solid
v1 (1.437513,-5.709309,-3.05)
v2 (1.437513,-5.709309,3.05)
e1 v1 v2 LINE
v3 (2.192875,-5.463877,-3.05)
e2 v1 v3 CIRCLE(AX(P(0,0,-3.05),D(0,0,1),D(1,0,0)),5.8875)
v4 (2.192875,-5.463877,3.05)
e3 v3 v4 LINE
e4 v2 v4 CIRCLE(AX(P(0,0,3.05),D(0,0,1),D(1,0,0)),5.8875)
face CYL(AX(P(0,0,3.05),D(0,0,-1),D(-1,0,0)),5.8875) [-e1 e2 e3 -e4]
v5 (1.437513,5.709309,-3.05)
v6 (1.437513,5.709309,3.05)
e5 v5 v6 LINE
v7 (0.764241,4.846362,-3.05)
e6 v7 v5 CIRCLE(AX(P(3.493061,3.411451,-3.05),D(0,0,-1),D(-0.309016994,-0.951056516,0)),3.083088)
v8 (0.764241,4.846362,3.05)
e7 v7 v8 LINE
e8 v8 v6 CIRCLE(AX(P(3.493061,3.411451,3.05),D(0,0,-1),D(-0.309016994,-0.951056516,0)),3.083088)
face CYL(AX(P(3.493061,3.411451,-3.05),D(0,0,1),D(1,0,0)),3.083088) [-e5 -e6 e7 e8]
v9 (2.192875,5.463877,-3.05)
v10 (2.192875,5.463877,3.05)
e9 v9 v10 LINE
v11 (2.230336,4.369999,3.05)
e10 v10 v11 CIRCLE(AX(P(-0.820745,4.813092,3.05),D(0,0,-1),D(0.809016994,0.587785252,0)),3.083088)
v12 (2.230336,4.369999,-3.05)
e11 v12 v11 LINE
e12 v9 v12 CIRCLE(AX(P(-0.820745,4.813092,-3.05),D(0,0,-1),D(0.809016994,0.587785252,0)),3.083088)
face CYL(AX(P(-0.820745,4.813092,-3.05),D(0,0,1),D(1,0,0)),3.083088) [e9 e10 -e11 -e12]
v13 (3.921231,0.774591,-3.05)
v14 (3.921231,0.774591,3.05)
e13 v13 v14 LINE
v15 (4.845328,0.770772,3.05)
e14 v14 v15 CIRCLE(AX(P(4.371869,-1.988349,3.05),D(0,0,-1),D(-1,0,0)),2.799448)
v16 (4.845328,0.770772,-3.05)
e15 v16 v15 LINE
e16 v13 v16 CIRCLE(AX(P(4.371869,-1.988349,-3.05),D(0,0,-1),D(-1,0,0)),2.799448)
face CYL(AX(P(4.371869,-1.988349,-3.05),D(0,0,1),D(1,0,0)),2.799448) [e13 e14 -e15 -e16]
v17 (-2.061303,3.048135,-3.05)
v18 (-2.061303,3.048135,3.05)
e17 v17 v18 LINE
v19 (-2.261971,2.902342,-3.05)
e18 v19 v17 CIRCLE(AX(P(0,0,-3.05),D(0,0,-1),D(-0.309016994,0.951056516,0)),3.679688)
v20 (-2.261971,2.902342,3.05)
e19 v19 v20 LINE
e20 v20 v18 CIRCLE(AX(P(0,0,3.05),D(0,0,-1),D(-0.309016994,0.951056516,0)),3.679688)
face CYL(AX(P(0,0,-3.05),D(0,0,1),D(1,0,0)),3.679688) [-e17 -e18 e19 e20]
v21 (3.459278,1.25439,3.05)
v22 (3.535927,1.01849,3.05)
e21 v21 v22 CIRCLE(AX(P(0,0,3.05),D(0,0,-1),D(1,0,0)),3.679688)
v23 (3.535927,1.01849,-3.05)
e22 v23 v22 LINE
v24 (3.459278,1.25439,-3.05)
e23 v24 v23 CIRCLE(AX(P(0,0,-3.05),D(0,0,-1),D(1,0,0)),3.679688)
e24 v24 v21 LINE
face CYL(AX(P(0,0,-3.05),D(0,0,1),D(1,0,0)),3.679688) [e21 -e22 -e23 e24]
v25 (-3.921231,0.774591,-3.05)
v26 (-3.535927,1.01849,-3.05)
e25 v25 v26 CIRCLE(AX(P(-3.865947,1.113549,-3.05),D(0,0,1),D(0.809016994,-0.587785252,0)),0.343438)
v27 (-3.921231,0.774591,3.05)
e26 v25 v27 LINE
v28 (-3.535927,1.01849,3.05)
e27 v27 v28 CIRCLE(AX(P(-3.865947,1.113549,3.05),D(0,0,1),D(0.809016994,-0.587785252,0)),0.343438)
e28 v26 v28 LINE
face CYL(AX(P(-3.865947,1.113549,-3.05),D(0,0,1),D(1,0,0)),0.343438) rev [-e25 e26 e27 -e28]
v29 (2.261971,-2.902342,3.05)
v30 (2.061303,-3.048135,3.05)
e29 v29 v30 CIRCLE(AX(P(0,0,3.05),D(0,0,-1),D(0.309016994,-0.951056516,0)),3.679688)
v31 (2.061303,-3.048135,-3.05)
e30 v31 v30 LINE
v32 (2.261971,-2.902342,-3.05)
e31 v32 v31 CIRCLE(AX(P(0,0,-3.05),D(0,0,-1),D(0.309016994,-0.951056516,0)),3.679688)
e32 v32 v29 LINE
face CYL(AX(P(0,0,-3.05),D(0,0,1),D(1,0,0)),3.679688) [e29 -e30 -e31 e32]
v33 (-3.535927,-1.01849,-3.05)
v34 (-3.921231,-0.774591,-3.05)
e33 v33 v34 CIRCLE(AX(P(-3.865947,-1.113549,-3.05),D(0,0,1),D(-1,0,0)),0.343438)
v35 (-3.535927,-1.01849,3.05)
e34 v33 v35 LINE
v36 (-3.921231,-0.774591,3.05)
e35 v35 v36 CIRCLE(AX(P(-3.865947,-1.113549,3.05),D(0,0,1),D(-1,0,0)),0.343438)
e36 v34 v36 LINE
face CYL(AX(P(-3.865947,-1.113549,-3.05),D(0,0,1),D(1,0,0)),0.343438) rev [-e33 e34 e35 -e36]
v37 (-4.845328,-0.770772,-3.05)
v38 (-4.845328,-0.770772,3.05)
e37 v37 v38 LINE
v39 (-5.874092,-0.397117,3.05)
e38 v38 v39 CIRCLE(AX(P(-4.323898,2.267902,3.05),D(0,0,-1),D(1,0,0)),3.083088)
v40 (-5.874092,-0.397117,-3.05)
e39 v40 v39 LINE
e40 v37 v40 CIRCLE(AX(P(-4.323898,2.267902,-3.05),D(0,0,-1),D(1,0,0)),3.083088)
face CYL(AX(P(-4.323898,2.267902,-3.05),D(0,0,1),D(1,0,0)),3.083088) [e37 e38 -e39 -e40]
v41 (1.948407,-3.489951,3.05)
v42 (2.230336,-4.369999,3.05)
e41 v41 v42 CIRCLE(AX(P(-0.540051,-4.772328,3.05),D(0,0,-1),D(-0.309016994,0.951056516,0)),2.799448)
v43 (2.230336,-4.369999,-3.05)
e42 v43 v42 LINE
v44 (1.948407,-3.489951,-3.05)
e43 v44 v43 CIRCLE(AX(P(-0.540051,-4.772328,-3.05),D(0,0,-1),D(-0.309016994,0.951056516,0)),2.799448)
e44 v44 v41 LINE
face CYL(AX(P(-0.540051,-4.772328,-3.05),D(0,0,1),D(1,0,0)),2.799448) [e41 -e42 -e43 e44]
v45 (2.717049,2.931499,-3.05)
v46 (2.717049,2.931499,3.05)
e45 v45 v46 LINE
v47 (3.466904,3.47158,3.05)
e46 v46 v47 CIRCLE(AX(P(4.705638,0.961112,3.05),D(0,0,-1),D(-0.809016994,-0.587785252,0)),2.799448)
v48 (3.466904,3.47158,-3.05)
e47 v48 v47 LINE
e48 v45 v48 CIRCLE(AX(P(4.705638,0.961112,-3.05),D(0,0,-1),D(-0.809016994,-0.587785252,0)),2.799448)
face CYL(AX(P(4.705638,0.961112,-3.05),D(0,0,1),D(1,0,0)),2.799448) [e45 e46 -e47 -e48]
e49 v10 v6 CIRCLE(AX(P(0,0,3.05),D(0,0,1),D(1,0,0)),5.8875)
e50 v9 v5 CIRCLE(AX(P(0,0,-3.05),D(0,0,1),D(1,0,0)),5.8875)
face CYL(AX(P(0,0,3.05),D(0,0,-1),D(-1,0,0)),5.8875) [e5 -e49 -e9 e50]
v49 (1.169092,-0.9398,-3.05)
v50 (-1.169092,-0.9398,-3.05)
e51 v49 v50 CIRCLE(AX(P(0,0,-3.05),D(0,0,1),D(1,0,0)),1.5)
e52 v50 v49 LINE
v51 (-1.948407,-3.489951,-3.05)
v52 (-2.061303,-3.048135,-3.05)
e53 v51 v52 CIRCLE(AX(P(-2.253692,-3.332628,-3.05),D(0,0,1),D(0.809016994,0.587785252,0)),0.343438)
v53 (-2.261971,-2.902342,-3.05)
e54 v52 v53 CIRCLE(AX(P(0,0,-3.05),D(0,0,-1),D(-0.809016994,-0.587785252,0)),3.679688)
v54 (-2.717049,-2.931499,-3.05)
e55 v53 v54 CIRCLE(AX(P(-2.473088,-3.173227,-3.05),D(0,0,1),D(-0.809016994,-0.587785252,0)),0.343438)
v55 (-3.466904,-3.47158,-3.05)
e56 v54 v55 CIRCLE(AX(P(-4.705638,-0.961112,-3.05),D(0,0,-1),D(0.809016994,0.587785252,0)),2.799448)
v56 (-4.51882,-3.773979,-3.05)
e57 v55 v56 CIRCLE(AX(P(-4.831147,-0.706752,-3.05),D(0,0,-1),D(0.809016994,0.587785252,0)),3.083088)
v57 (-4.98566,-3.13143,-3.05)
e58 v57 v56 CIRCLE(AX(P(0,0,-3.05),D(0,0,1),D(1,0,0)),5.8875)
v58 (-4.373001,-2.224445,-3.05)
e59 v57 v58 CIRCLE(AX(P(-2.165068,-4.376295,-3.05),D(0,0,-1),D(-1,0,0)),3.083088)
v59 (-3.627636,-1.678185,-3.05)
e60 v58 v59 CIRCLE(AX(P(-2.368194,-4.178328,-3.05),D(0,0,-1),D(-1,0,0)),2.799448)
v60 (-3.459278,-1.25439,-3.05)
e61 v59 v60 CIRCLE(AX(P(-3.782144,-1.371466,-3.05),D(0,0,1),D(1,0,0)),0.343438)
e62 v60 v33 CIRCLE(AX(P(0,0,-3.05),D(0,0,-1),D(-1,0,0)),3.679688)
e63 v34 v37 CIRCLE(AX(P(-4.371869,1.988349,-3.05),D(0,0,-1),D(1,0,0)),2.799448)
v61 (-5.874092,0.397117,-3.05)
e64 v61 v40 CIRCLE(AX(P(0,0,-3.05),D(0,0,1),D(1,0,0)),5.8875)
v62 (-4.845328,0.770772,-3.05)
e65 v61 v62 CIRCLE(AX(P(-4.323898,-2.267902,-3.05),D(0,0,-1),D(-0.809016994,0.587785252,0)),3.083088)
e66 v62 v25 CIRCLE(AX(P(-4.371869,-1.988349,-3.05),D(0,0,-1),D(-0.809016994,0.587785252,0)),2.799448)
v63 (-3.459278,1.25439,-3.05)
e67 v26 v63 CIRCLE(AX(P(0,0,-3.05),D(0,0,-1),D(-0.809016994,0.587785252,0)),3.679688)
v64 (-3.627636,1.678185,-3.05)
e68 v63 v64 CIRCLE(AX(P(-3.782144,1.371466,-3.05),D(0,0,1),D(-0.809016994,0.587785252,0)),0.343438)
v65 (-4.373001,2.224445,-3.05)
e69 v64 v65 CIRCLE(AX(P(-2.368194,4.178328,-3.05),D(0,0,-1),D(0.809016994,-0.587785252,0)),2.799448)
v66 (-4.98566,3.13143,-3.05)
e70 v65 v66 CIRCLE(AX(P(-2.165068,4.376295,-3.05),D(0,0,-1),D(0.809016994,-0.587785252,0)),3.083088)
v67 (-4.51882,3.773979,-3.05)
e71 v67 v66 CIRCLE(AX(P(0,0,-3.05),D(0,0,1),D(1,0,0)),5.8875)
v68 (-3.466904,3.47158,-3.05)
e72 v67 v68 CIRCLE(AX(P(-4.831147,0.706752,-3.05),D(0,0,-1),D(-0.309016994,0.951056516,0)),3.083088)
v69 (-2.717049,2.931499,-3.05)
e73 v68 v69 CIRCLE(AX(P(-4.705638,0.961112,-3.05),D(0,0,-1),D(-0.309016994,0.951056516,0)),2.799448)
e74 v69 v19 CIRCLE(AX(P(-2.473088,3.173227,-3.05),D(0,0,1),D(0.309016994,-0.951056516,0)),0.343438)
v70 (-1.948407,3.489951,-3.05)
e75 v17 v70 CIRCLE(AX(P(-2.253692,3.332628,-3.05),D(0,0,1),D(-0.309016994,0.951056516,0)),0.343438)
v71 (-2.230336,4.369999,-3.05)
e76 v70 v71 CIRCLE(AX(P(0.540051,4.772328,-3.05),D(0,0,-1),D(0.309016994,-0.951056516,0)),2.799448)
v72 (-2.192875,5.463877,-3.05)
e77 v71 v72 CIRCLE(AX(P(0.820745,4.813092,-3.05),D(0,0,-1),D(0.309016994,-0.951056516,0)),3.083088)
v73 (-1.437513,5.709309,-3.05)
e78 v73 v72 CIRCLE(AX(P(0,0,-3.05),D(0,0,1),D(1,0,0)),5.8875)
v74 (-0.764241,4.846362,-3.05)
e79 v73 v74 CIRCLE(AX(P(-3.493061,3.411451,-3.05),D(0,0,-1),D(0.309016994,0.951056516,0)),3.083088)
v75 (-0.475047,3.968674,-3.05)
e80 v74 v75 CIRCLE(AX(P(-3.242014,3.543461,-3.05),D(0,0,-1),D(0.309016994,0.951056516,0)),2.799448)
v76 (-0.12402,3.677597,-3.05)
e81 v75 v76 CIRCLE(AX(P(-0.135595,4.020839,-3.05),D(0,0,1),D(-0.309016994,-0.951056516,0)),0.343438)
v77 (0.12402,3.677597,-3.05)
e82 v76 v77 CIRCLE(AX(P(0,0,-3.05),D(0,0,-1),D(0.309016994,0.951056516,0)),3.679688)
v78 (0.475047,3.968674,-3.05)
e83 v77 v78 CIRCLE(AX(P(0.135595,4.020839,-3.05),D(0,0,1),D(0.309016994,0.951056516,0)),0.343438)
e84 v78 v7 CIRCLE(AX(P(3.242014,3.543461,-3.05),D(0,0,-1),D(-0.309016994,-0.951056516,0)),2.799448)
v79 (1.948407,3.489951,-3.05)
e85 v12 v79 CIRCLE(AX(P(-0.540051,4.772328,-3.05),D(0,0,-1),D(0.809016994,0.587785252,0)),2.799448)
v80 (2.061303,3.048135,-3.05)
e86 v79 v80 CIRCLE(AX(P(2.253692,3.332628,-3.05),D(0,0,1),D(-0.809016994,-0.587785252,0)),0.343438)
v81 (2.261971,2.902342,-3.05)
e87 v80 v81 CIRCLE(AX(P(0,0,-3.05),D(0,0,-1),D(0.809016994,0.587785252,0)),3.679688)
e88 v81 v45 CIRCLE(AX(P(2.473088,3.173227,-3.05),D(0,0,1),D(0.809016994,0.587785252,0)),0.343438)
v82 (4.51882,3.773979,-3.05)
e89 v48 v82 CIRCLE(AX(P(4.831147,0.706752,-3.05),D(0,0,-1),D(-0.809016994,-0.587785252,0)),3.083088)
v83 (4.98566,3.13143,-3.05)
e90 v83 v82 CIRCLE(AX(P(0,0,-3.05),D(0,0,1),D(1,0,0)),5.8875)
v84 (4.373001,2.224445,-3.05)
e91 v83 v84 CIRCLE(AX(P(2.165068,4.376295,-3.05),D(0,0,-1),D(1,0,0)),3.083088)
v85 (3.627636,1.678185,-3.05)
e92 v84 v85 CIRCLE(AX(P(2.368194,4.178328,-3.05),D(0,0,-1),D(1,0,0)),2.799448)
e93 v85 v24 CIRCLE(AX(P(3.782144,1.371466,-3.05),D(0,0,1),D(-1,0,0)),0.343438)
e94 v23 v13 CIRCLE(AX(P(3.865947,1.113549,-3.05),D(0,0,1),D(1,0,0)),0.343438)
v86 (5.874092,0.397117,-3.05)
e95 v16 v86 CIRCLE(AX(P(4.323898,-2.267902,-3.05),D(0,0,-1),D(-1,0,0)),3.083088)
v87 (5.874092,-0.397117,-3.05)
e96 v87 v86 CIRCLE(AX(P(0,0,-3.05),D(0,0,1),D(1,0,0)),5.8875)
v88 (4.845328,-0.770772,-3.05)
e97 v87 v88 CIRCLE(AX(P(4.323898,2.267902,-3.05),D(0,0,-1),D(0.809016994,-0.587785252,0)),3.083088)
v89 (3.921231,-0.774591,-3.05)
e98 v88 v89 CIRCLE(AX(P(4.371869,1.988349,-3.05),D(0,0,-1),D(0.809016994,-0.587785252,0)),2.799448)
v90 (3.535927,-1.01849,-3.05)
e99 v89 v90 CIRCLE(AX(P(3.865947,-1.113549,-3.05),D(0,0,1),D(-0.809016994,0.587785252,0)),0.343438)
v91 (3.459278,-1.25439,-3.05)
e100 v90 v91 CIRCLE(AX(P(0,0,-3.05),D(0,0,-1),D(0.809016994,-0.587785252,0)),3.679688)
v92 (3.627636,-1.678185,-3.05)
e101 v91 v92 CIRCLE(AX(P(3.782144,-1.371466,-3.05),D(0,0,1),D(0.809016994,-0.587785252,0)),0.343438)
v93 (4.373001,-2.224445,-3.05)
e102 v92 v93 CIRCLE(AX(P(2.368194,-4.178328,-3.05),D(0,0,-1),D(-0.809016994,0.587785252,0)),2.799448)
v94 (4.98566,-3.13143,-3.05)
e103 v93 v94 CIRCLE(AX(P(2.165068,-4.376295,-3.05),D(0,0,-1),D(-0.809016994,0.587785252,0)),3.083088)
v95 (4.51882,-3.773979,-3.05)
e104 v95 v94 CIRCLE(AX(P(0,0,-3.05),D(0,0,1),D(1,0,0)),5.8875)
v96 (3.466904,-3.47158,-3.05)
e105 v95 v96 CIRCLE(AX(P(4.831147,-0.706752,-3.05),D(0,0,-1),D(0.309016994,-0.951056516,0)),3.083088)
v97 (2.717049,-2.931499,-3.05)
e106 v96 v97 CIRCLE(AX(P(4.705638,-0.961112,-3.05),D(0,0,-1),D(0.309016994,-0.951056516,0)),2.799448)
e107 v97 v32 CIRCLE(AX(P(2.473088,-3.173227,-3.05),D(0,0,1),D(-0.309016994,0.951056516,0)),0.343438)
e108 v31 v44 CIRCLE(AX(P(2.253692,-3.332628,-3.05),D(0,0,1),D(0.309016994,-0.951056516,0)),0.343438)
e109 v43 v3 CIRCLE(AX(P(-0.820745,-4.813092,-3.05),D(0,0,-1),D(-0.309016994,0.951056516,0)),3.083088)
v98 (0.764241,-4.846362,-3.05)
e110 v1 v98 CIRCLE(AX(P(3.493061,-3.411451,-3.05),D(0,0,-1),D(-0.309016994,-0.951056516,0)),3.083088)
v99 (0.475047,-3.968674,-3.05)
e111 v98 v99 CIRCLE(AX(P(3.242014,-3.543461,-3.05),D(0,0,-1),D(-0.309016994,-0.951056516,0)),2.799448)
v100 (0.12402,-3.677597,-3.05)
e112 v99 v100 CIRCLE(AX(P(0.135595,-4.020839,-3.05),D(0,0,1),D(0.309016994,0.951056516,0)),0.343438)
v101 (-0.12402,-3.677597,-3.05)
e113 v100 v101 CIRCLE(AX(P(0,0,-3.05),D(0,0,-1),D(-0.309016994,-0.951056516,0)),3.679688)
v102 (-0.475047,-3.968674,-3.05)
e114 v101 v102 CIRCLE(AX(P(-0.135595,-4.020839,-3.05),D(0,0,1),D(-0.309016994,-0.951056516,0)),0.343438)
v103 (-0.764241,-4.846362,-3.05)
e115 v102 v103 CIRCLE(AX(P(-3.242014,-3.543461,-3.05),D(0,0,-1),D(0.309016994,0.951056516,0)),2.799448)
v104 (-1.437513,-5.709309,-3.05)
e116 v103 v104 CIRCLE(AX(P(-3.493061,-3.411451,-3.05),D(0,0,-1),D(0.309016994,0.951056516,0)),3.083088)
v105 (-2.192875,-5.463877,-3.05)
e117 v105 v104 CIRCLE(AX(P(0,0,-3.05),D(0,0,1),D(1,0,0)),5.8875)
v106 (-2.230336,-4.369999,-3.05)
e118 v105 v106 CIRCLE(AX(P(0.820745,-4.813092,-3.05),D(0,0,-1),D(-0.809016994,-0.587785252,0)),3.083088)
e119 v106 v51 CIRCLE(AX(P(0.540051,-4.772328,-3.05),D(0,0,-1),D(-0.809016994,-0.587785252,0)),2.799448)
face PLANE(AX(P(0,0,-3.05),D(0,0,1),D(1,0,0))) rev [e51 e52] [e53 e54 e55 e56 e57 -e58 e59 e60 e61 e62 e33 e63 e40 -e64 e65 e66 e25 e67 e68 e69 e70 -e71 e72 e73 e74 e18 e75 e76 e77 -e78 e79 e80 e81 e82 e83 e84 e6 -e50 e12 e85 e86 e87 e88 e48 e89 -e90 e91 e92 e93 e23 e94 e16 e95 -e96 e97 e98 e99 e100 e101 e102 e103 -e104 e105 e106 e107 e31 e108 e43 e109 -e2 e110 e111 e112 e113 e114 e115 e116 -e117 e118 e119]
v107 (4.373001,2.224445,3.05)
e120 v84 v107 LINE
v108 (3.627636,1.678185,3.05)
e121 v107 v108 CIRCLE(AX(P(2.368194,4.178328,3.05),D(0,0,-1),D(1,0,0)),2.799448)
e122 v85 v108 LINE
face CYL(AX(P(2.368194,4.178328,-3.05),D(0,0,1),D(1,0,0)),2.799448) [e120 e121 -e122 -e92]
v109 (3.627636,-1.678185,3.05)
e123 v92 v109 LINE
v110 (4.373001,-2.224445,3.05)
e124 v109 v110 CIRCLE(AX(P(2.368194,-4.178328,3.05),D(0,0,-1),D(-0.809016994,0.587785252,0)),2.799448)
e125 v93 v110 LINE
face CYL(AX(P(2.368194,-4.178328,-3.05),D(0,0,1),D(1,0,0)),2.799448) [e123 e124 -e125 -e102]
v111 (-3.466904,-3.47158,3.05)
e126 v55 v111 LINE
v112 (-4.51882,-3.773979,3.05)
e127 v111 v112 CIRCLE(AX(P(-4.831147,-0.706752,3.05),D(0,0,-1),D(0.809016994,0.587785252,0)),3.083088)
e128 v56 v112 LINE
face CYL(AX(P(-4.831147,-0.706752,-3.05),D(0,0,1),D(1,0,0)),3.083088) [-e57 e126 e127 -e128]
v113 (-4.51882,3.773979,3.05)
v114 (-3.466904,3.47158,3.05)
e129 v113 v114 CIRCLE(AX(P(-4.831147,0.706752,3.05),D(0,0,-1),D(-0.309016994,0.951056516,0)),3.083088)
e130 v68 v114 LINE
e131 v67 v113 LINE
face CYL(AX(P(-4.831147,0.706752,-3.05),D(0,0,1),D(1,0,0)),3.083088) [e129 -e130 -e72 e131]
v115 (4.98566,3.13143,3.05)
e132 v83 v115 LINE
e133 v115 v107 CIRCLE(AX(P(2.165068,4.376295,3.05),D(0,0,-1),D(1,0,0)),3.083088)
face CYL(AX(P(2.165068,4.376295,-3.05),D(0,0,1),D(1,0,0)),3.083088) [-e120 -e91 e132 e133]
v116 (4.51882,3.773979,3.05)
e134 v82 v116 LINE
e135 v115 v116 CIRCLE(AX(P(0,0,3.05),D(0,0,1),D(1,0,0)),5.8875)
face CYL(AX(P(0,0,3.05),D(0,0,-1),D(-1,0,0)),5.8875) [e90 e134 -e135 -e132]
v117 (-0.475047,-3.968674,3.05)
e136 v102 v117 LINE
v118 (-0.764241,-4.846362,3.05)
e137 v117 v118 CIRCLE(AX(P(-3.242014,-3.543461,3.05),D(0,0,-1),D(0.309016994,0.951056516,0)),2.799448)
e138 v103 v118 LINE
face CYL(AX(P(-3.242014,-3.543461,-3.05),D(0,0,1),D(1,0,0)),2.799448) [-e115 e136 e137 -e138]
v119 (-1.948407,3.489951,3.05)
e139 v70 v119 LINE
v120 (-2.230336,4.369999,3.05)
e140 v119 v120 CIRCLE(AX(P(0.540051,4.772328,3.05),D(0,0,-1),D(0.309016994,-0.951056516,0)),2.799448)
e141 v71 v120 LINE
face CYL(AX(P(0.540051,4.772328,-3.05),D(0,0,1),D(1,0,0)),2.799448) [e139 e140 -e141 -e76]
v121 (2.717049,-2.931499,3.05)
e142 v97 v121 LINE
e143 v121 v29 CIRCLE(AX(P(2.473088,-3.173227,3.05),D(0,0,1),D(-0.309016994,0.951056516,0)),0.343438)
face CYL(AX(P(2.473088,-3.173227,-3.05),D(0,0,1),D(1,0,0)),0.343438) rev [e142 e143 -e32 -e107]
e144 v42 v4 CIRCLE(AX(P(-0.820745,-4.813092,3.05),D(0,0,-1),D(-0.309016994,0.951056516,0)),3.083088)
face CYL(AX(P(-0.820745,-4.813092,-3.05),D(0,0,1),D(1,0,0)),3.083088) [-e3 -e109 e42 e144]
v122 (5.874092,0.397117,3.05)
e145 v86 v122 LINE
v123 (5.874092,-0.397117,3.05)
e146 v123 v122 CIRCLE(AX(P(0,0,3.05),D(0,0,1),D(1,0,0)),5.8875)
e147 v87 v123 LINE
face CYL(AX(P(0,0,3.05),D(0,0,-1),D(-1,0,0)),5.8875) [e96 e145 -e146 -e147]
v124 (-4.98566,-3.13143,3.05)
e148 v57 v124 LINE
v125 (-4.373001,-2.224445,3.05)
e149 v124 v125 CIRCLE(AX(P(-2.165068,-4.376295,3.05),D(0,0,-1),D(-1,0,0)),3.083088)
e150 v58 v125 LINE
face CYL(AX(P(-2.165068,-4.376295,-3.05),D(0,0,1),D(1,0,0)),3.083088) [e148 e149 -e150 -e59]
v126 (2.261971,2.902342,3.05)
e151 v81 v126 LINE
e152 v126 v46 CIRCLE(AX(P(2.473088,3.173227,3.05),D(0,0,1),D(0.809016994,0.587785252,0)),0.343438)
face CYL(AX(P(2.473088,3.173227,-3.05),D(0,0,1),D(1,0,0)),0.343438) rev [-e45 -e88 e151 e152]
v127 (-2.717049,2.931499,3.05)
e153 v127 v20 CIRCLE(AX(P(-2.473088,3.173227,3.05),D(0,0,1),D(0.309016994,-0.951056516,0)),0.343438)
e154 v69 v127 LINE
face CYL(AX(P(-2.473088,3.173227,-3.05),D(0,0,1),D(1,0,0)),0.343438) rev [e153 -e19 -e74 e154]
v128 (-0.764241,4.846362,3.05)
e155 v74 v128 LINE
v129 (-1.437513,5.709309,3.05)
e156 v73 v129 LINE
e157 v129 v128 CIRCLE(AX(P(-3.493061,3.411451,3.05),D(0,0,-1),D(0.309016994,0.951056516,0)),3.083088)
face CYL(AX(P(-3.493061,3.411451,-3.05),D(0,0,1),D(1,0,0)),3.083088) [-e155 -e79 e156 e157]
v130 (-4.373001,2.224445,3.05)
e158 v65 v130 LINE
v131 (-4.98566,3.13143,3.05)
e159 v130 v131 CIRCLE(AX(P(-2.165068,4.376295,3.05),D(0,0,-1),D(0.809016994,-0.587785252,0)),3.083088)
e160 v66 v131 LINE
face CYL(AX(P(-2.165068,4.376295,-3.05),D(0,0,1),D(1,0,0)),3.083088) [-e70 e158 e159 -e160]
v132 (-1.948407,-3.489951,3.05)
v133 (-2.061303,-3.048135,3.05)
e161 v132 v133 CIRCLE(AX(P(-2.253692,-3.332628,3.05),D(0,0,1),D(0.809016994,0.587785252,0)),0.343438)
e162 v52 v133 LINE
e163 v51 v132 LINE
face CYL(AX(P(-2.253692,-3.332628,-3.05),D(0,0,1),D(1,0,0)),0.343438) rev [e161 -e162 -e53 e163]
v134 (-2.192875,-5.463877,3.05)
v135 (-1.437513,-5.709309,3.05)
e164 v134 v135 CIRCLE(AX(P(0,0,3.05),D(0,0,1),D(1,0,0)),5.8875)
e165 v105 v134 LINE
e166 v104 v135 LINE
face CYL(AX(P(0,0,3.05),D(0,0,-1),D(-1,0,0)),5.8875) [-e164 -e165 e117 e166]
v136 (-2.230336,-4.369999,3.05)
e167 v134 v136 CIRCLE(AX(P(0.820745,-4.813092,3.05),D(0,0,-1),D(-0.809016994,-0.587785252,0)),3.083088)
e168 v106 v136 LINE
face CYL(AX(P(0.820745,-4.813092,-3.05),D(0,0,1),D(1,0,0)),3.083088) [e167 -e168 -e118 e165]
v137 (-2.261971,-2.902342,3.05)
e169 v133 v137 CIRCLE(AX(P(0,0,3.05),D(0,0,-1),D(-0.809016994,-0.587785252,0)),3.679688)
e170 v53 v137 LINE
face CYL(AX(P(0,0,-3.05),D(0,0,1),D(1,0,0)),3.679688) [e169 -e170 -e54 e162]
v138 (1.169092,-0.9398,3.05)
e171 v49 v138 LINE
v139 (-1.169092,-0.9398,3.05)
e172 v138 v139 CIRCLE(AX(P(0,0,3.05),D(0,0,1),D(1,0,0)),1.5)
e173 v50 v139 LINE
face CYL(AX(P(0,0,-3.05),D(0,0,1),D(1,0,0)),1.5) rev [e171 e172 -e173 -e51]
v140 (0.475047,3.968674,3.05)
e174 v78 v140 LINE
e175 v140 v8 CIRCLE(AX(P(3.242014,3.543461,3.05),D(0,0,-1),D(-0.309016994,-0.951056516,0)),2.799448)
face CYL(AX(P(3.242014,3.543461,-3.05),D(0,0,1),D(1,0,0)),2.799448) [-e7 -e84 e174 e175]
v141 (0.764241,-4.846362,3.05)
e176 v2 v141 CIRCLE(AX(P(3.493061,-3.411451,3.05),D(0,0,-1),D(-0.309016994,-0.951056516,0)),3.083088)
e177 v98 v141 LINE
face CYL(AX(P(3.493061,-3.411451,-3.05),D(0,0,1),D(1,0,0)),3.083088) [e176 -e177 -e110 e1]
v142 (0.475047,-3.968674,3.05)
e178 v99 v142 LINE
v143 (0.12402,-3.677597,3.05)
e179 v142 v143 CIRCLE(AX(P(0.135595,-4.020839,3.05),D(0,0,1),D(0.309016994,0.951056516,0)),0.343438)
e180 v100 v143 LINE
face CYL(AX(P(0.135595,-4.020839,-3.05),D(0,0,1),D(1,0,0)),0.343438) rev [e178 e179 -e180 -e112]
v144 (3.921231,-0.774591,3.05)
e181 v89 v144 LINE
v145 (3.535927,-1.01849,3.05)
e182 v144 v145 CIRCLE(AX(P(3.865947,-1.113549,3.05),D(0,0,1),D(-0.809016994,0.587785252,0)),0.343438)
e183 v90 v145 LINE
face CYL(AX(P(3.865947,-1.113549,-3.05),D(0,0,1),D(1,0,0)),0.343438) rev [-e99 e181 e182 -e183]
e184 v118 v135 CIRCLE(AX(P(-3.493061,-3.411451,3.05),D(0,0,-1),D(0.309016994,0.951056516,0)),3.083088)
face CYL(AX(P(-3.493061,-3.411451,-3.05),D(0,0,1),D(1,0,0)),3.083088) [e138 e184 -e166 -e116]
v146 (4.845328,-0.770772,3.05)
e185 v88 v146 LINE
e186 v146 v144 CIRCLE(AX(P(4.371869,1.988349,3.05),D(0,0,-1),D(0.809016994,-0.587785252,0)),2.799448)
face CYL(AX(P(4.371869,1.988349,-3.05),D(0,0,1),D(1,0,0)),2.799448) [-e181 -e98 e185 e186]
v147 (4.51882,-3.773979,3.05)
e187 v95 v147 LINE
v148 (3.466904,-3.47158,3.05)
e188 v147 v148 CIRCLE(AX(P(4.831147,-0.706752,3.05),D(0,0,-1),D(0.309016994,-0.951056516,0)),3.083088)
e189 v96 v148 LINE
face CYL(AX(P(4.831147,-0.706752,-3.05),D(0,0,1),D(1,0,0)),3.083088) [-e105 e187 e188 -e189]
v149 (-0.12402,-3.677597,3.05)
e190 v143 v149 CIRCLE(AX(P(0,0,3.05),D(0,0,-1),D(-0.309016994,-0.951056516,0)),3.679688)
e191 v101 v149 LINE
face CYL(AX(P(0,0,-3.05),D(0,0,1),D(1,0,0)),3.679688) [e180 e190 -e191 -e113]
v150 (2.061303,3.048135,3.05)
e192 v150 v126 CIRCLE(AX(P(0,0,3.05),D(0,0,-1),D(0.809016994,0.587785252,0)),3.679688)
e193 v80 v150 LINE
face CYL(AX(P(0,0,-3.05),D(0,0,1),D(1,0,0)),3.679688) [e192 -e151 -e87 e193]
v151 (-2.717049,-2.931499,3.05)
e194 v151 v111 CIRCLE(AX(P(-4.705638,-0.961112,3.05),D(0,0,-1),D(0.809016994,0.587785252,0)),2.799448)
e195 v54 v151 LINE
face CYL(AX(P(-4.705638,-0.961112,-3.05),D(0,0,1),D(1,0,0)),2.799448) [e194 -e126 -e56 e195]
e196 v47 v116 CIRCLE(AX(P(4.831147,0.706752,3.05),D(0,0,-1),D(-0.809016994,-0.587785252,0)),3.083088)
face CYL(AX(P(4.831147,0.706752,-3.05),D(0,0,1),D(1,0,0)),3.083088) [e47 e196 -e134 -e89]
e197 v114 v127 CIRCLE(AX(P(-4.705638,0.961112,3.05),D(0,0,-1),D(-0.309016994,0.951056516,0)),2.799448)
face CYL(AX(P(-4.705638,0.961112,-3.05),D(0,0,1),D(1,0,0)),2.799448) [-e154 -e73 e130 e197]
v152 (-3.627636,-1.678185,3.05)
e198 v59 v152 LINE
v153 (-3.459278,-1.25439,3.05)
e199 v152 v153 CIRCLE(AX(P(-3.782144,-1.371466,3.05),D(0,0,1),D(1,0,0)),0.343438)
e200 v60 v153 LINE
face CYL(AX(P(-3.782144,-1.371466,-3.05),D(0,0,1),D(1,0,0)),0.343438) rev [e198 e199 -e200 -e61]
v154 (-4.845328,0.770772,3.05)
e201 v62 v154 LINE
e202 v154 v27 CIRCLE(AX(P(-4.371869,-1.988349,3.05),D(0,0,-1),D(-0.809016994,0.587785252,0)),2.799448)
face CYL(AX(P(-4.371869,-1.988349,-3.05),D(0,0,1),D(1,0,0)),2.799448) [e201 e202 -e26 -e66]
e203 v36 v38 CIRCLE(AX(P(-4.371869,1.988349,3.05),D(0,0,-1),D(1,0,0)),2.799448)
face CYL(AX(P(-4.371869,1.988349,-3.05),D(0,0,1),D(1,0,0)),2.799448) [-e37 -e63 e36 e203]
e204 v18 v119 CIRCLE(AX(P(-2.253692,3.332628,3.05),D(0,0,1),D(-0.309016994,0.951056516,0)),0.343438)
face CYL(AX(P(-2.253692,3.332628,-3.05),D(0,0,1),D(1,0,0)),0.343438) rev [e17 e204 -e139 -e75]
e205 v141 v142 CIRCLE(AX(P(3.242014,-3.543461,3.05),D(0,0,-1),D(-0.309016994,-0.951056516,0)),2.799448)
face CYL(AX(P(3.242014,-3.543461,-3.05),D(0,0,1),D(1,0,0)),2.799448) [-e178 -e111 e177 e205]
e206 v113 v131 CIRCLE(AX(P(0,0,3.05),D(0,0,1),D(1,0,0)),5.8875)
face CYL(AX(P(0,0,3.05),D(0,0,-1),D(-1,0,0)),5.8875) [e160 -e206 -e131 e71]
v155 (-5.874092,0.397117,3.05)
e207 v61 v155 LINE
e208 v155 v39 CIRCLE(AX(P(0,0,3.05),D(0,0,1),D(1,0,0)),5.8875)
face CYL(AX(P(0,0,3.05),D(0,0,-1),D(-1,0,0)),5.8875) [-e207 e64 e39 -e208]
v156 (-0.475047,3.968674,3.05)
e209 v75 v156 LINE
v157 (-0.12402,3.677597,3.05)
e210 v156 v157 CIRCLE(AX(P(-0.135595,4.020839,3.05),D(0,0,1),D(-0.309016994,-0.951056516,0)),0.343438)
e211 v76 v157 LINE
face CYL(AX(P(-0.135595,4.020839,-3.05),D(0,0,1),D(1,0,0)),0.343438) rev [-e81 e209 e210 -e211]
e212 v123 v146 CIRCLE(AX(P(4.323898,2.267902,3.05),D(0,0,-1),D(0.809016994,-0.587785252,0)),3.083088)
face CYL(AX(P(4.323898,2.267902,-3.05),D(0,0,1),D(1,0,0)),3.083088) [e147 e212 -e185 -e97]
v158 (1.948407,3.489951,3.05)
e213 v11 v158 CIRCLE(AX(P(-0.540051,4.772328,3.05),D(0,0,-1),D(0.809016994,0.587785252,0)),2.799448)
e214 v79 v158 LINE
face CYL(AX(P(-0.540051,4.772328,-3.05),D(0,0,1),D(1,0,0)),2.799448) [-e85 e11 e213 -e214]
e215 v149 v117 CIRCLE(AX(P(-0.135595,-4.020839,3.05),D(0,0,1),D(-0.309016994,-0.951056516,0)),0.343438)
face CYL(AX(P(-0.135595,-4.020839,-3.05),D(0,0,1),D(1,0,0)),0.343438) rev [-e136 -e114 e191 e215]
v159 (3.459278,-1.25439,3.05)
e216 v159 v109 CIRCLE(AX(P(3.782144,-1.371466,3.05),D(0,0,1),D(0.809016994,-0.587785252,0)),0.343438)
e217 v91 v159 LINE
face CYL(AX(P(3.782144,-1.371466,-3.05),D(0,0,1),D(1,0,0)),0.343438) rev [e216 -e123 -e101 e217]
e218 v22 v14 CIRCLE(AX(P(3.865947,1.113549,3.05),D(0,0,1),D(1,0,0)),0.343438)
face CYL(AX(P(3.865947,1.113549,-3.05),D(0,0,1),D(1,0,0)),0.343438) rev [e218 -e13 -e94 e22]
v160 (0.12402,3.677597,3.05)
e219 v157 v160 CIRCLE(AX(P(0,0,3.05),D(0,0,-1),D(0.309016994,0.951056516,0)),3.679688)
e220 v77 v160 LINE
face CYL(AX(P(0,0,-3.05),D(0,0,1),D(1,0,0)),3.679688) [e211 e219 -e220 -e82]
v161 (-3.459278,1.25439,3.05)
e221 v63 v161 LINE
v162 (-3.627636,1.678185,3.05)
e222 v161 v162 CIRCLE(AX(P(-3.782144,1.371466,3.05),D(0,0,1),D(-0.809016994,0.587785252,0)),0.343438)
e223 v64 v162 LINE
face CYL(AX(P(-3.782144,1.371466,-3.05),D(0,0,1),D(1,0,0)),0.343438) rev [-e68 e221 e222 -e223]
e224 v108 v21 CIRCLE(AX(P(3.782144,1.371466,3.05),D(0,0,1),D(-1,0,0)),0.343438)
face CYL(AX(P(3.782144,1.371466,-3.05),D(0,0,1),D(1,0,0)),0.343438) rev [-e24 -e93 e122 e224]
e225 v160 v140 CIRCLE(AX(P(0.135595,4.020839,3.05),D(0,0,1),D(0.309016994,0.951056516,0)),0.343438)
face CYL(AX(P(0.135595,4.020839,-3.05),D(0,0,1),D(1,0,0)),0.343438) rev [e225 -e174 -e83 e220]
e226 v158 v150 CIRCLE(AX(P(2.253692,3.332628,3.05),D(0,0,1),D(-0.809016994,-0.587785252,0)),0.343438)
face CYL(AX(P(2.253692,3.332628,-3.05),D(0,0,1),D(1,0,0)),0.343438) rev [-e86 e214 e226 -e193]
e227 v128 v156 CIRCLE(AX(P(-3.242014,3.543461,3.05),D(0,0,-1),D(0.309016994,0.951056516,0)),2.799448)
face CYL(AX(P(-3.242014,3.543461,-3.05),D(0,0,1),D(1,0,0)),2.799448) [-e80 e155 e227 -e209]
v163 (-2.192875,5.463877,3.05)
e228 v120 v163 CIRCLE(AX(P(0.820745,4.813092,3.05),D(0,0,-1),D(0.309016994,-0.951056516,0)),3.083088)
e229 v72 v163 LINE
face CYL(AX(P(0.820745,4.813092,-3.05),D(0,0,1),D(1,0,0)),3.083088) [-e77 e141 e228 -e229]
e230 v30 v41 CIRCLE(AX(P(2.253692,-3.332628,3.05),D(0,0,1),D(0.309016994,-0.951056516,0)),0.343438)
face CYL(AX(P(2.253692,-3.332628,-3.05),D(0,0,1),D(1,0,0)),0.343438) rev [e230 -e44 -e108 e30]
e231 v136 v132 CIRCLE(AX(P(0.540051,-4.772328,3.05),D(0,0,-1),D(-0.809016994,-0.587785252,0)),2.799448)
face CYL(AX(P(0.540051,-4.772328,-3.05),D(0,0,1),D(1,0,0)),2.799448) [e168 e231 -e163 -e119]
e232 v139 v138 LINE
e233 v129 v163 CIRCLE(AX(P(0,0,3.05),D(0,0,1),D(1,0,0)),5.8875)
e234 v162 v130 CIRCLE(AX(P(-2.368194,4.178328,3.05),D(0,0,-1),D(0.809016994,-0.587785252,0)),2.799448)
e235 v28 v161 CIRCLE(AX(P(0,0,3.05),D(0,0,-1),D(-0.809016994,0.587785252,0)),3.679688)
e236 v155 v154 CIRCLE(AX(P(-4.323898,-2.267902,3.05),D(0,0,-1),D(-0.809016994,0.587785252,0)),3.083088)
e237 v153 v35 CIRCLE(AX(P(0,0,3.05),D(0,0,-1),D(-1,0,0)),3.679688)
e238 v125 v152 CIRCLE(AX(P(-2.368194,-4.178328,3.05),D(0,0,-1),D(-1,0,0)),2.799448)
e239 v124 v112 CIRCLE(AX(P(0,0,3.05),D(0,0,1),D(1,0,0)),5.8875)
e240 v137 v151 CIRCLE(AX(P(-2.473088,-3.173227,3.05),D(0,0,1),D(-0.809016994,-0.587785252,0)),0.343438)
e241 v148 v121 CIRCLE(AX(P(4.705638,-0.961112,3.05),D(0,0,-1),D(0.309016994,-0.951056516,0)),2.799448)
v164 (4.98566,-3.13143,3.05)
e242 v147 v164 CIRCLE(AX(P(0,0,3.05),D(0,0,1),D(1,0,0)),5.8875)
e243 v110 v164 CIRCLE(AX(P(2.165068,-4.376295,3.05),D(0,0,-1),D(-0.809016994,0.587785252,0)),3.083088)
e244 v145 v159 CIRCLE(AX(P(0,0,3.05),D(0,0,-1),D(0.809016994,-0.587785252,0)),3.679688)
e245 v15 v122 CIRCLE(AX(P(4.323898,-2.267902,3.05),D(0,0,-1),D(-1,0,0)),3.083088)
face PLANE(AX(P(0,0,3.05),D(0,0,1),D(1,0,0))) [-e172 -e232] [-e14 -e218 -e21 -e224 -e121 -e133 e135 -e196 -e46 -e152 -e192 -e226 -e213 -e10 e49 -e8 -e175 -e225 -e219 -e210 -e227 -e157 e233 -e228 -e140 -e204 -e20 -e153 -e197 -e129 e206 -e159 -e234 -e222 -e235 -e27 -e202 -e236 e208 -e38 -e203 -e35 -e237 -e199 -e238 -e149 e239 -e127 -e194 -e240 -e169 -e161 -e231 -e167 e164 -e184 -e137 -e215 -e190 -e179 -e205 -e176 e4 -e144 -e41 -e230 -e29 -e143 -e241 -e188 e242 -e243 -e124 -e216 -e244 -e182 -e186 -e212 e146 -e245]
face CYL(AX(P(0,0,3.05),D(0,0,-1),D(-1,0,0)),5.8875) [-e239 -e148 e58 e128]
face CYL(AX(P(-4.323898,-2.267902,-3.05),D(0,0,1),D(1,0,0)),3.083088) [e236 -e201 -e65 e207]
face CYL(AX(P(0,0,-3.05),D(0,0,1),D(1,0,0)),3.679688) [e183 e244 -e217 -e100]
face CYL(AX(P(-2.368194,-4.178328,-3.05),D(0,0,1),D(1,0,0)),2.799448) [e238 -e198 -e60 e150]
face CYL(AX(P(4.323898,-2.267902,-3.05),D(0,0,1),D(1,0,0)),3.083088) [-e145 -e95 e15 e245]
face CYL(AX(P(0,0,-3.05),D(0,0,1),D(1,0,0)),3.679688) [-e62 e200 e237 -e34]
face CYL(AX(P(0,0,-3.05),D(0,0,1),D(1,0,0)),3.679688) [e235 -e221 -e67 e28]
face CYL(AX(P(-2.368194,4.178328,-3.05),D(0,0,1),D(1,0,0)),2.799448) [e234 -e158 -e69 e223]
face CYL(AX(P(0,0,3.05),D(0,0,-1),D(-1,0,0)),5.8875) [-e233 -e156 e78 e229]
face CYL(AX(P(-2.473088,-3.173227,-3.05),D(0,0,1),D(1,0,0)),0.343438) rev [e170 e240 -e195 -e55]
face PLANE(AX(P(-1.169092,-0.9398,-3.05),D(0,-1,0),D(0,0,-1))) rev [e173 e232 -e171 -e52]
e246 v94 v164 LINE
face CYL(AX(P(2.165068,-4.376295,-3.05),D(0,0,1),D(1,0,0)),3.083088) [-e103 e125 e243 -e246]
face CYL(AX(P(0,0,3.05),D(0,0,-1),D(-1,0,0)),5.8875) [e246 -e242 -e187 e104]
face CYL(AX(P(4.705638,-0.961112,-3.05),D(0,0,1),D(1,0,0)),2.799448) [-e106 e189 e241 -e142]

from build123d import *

# Parameters (mm, degrees)
SKETCH1_R                = 5.887500036
BLANK_DISK_DEPTH         = 3.05
GEAR_TOOTH_CUT_DEPTH     = 11.321594513
GEAR_START               = -3.049999996
GEAR_TEETH_REVOLVE_DEPTH = 6.099999992
HUB_EXTRUDE_DEPTH        = 11.221001367


# Read off the part's stored shape, not the designer's step: GEAR TEETH REVOLVE
with BuildPart() as part:
    # Sketch1 → BLANK DISK (new, symmetric)
    with BuildSketch(Plane.XY):
        with Locations(Location((0, 0, 0), (0, 0, 180))):
            Circle(SKETCH1_R)
    extrude(amount=BLANK_DISK_DEPTH, both=True)

    # Sketch2 → GEAR TOOTH CUT (cut, through all)
    with BuildSketch(Plane.XY.offset(3.049999996)):
        with BuildLine():
            ThreePointArc((-4.985659759, -3.131429935), (-5.599345274, -1.819337566), (-5.874091808, -0.397117245))
            ThreePointArc((-5.874091808, -0.397117245), (-5.376423722, -0.629962338), (-4.845327653, -0.77077188))
            ThreePointArc((-4.845327653, -0.77077188), (-4.383437981, -0.811075473), (-3.921230969, -0.774590865))
            ThreePointArc((-3.921230969, -0.774590865), (-3.682257583, -0.823363871), (-3.535926696, -1.018490385))
            ThreePointArc((-3.535926696, -1.018490385), (-3.499590796, -1.137085978), (-3.459278416, -1.254389535))
            ThreePointArc((-3.459278416, -1.254389535), (-3.462970103, -1.498261339), (-3.627635579, -1.678184561))
            ThreePointArc((-3.627635579, -1.678184561), (-4.023014022, -1.920346358), (-4.373000758, -2.224444588))
            ThreePointArc((-4.373000758, -2.224444588), (-4.719900732, -2.650532337), (-4.985659759, -3.131429935))
        make_face()
    extrude(amount=-GEAR_TOOTH_CUT_DEPTH, mode=Mode.SUBTRACT)

    # GEAR TEETH REVOLVE outline → GEAR TEETH REVOLVE (cut)
    with BuildSketch(Plane.XY.offset(GEAR_START)):
        with BuildLine():
            ThreePointArc((-4.518820439, -3.773979135), (-3.460585694, -4.763087583), (-2.192875139, -5.463877313))
            ThreePointArc((-2.192875139, -5.463877313), (-2.260536085, -4.918613747), (-2.230336207, -4.369998828))
            ThreePointArc((-2.230336207, -4.369998828), (-2.125935444, -3.918261151), (-1.948406698, -3.489950524))
            ThreePointArc((-1.948406698, -3.489950524), (-1.920945745, -3.247601641), (-2.061303357, -3.048135288))
            ThreePointArc((-2.061303357, -3.048135288), (-2.162866059, -2.97692974), (-2.26197116, -2.902341595))
            ThreePointArc((-2.26197116, -2.902341595), (-2.495047822, -2.830492067), (-2.717049406, -2.931498908))
            ThreePointArc((-2.717049406, -2.931498908), (-3.069537619, -3.232694041), (-3.466904071, -3.471579687))
            ThreePointArc((-3.466904071, -3.471579687), (-3.979335588, -3.669832811), (-4.518820439, -3.773979135))
        make_face()
        with BuildLine():
            ThreePointArc((-1.437513252, -5.709309268), (0, -5.887500035), (1.437513252, -5.709309268))
            ThreePointArc((1.437513252, -5.709309268), (1.062276513, -5.307951883), (0.764240969, -4.846362048))
            ThreePointArc((0.764240969, -4.846362048), (0.583178216, -4.419533361), (0.475047319, -3.968674006))
            ThreePointArc((0.475047319, -3.968674006), (0.354814597, -3.756468498), (0.124019523, -3.677596963))
            ThreePointArc((0.124019523, -3.677596963), (0, -3.679687523), (-0.124019523, -3.677596963))
            ThreePointArc((-0.124019523, -3.677596963), (-0.354814597, -3.756468498), (-0.475047319, -3.968674006))
            ThreePointArc((-0.475047319, -3.968674006), (-0.583178216, -4.419533361), (-0.764240969, -4.846362048))
            ThreePointArc((-0.764240969, -4.846362048), (-1.062276513, -5.307951883), (-1.437513252, -5.709309268))
        make_face()
        with BuildLine():
            ThreePointArc((2.192875139, -5.463877313), (3.460585694, -4.763087583), (4.518820439, -3.773979135))
            ThreePointArc((4.518820439, -3.773979135), (3.979335588, -3.669832811), (3.466904071, -3.471579687))
            ThreePointArc((3.466904071, -3.471579687), (3.069537619, -3.232694041), (2.717049406, -2.931498908))
            ThreePointArc((2.717049406, -2.931498908), (2.495047822, -2.830492067), (2.26197116, -2.902341595))
            ThreePointArc((2.26197116, -2.902341595), (2.162866059, -2.97692974), (2.061303357, -3.048135288))
            ThreePointArc((2.061303357, -3.048135288), (1.920945745, -3.247601641), (1.948406698, -3.489950524))
            ThreePointArc((1.948406698, -3.489950524), (2.125935444, -3.918261151), (2.230336207, -4.369998828))
            ThreePointArc((2.230336207, -4.369998828), (2.260536085, -4.918613747), (2.192875139, -5.463877313))
        make_face()
        with BuildLine():
            ThreePointArc((4.985659759, -3.131429935), (5.599345274, -1.819337565), (5.874091808, -0.397117245))
            ThreePointArc((5.874091808, -0.397117245), (5.376423722, -0.629962338), (4.845327653, -0.77077188))
            ThreePointArc((4.845327653, -0.77077188), (4.383437981, -0.811075473), (3.921230969, -0.774590865))
            ThreePointArc((3.921230969, -0.774590865), (3.682257583, -0.823363871), (3.535926696, -1.018490385))
            ThreePointArc((3.535926696, -1.018490385), (3.499590796, -1.137085978), (3.459278416, -1.254389535))
            ThreePointArc((3.459278416, -1.254389535), (3.462970103, -1.498261338), (3.627635579, -1.678184561))
            ThreePointArc((3.627635579, -1.678184561), (4.023014022, -1.920346358), (4.373000758, -2.224444588))
            ThreePointArc((4.373000758, -2.224444588), (4.719900732, -2.650532336), (4.985659759, -3.131429935))
        make_face()
        with BuildLine():
            ThreePointArc((5.874091808, 0.397117245), (5.599345274, 1.819337566), (4.98565976, 3.131429935))
            ThreePointArc((4.98565976, 3.131429935), (4.719900732, 2.650532336), (4.373000758, 2.224444588))
            ThreePointArc((4.373000758, 2.224444588), (4.023014022, 1.920346358), (3.627635579, 1.678184561))
            ThreePointArc((3.627635579, 1.678184561), (3.462970103, 1.498261338), (3.459278416, 1.254389535))
            ThreePointArc((3.459278416, 1.254389535), (3.499590796, 1.137085978), (3.535926696, 1.018490385))
            ThreePointArc((3.535926696, 1.018490385), (3.682257583, 0.823363871), (3.921230969, 0.774590865))
            ThreePointArc((3.921230969, 0.774590865), (4.383437981, 0.811075473), (4.845327653, 0.77077188))
            ThreePointArc((4.845327653, 0.77077188), (5.376423722, 0.629962338), (5.874091808, 0.397117245))
        make_face()
        with BuildLine():
            ThreePointArc((4.51882044, 3.773979135), (3.460585695, 4.763087584), (2.192875139, 5.463877314))
            ThreePointArc((2.192875139, 5.463877314), (2.260536085, 4.918613747), (2.230336207, 4.369998828))
            ThreePointArc((2.230336207, 4.369998828), (2.125935444, 3.918261151), (1.948406698, 3.489950524))
            ThreePointArc((1.948406698, 3.489950524), (1.920945745, 3.247601641), (2.061303357, 3.048135288))
            ThreePointArc((2.061303357, 3.048135288), (2.162866059, 2.97692974), (2.26197116, 2.902341595))
            ThreePointArc((2.26197116, 2.902341595), (2.495047822, 2.830492067), (2.717049406, 2.931498908))
            ThreePointArc((2.717049406, 2.931498908), (3.069537619, 3.232694041), (3.466904071, 3.471579687))
            ThreePointArc((3.466904071, 3.471579687), (3.979335588, 3.669832811), (4.51882044, 3.773979135))
        make_face()
        with BuildLine():
            ThreePointArc((1.437513252, 5.709309269), (0, 5.887500037), (-1.437513252, 5.709309269))
            ThreePointArc((-1.437513252, 5.709309269), (-1.062276513, 5.307951883), (-0.764240969, 4.846362048))
            ThreePointArc((-0.764240969, 4.846362048), (-0.583178216, 4.419533361), (-0.475047319, 3.968674006))
            ThreePointArc((-0.475047319, 3.968674006), (-0.354814597, 3.756468498), (-0.124019523, 3.677596963))
            ThreePointArc((-0.124019523, 3.677596963), (0, 3.679687523), (0.124019523, 3.677596963))
            ThreePointArc((0.124019523, 3.677596963), (0.354814597, 3.756468498), (0.475047319, 3.968674006))
            ThreePointArc((0.475047319, 3.968674006), (0.583178216, 4.419533361), (0.764240969, 4.846362048))
            ThreePointArc((0.764240969, 4.846362048), (1.062276513, 5.307951883), (1.437513252, 5.709309269))
        make_face()
        with BuildLine():
            ThreePointArc((-2.192875139, 5.463877315), (-3.460585695, 4.763087584), (-4.51882044, 3.773979136))
            ThreePointArc((-4.51882044, 3.773979136), (-3.979335588, 3.669832811), (-3.466904071, 3.471579687))
            ThreePointArc((-3.466904071, 3.471579687), (-3.069537619, 3.232694041), (-2.717049406, 2.931498908))
            ThreePointArc((-2.717049406, 2.931498908), (-2.495047822, 2.830492067), (-2.26197116, 2.902341595))
            ThreePointArc((-2.26197116, 2.902341595), (-2.162866059, 2.97692974), (-2.061303357, 3.048135288))
            ThreePointArc((-2.061303357, 3.048135288), (-1.920945745, 3.247601641), (-1.948406698, 3.489950524))
            ThreePointArc((-1.948406698, 3.489950524), (-2.125935444, 3.918261151), (-2.230336207, 4.369998828))
            ThreePointArc((-2.230336207, 4.369998828), (-2.260536085, 4.918613747), (-2.192875139, 5.463877315))
        make_face()
        with BuildLine():
            ThreePointArc((-3.535926696, 1.018490385), (-3.499590796, 1.137085978), (-3.459278416, 1.254389535))
            ThreePointArc((-3.459278416, 1.254389535), (-3.462970103, 1.498261338), (-3.627635579, 1.678184561))
            ThreePointArc((-3.627635579, 1.678184561), (-4.023014022, 1.920346358), (-4.373000758, 2.224444588))
            ThreePointArc((-4.373000758, 2.224444588), (-4.719900732, 2.650532336), (-4.985659759, 3.131429935))
            ThreePointArc((-4.985659759, 3.131429935), (-5.599345274, 1.819337566), (-5.874091808, 0.397117245))
            ThreePointArc((-5.874091808, 0.397117245), (-5.376423722, 0.629962338), (-4.845327653, 0.77077188))
            ThreePointArc((-4.845327653, 0.77077188), (-4.383437981, 0.811075473), (-3.921230969, 0.774590865))
            ThreePointArc((-3.921230969, 0.774590865), (-3.682257583, 0.823363871), (-3.535926696, 1.018490385))
        make_face()
    extrude(amount=GEAR_TEETH_REVOLVE_DEPTH, mode=Mode.SUBTRACT)

    # Sketch3 → HUB EXTRUDE (cut, through all)
    with BuildSketch(Plane.XY.offset(3.049999996)):
        with BuildLine():
            Line((-1.169092, -0.9398), (1.169092, -0.9398))
            ThreePointArc((1.169092, -0.9398), (0, 1.500000048), (-1.169092, -0.9398))
        make_face()
    extrude(amount=-HUB_EXTRUDE_DEPTH, mode=Mode.SUBTRACT)


solid = part.part
